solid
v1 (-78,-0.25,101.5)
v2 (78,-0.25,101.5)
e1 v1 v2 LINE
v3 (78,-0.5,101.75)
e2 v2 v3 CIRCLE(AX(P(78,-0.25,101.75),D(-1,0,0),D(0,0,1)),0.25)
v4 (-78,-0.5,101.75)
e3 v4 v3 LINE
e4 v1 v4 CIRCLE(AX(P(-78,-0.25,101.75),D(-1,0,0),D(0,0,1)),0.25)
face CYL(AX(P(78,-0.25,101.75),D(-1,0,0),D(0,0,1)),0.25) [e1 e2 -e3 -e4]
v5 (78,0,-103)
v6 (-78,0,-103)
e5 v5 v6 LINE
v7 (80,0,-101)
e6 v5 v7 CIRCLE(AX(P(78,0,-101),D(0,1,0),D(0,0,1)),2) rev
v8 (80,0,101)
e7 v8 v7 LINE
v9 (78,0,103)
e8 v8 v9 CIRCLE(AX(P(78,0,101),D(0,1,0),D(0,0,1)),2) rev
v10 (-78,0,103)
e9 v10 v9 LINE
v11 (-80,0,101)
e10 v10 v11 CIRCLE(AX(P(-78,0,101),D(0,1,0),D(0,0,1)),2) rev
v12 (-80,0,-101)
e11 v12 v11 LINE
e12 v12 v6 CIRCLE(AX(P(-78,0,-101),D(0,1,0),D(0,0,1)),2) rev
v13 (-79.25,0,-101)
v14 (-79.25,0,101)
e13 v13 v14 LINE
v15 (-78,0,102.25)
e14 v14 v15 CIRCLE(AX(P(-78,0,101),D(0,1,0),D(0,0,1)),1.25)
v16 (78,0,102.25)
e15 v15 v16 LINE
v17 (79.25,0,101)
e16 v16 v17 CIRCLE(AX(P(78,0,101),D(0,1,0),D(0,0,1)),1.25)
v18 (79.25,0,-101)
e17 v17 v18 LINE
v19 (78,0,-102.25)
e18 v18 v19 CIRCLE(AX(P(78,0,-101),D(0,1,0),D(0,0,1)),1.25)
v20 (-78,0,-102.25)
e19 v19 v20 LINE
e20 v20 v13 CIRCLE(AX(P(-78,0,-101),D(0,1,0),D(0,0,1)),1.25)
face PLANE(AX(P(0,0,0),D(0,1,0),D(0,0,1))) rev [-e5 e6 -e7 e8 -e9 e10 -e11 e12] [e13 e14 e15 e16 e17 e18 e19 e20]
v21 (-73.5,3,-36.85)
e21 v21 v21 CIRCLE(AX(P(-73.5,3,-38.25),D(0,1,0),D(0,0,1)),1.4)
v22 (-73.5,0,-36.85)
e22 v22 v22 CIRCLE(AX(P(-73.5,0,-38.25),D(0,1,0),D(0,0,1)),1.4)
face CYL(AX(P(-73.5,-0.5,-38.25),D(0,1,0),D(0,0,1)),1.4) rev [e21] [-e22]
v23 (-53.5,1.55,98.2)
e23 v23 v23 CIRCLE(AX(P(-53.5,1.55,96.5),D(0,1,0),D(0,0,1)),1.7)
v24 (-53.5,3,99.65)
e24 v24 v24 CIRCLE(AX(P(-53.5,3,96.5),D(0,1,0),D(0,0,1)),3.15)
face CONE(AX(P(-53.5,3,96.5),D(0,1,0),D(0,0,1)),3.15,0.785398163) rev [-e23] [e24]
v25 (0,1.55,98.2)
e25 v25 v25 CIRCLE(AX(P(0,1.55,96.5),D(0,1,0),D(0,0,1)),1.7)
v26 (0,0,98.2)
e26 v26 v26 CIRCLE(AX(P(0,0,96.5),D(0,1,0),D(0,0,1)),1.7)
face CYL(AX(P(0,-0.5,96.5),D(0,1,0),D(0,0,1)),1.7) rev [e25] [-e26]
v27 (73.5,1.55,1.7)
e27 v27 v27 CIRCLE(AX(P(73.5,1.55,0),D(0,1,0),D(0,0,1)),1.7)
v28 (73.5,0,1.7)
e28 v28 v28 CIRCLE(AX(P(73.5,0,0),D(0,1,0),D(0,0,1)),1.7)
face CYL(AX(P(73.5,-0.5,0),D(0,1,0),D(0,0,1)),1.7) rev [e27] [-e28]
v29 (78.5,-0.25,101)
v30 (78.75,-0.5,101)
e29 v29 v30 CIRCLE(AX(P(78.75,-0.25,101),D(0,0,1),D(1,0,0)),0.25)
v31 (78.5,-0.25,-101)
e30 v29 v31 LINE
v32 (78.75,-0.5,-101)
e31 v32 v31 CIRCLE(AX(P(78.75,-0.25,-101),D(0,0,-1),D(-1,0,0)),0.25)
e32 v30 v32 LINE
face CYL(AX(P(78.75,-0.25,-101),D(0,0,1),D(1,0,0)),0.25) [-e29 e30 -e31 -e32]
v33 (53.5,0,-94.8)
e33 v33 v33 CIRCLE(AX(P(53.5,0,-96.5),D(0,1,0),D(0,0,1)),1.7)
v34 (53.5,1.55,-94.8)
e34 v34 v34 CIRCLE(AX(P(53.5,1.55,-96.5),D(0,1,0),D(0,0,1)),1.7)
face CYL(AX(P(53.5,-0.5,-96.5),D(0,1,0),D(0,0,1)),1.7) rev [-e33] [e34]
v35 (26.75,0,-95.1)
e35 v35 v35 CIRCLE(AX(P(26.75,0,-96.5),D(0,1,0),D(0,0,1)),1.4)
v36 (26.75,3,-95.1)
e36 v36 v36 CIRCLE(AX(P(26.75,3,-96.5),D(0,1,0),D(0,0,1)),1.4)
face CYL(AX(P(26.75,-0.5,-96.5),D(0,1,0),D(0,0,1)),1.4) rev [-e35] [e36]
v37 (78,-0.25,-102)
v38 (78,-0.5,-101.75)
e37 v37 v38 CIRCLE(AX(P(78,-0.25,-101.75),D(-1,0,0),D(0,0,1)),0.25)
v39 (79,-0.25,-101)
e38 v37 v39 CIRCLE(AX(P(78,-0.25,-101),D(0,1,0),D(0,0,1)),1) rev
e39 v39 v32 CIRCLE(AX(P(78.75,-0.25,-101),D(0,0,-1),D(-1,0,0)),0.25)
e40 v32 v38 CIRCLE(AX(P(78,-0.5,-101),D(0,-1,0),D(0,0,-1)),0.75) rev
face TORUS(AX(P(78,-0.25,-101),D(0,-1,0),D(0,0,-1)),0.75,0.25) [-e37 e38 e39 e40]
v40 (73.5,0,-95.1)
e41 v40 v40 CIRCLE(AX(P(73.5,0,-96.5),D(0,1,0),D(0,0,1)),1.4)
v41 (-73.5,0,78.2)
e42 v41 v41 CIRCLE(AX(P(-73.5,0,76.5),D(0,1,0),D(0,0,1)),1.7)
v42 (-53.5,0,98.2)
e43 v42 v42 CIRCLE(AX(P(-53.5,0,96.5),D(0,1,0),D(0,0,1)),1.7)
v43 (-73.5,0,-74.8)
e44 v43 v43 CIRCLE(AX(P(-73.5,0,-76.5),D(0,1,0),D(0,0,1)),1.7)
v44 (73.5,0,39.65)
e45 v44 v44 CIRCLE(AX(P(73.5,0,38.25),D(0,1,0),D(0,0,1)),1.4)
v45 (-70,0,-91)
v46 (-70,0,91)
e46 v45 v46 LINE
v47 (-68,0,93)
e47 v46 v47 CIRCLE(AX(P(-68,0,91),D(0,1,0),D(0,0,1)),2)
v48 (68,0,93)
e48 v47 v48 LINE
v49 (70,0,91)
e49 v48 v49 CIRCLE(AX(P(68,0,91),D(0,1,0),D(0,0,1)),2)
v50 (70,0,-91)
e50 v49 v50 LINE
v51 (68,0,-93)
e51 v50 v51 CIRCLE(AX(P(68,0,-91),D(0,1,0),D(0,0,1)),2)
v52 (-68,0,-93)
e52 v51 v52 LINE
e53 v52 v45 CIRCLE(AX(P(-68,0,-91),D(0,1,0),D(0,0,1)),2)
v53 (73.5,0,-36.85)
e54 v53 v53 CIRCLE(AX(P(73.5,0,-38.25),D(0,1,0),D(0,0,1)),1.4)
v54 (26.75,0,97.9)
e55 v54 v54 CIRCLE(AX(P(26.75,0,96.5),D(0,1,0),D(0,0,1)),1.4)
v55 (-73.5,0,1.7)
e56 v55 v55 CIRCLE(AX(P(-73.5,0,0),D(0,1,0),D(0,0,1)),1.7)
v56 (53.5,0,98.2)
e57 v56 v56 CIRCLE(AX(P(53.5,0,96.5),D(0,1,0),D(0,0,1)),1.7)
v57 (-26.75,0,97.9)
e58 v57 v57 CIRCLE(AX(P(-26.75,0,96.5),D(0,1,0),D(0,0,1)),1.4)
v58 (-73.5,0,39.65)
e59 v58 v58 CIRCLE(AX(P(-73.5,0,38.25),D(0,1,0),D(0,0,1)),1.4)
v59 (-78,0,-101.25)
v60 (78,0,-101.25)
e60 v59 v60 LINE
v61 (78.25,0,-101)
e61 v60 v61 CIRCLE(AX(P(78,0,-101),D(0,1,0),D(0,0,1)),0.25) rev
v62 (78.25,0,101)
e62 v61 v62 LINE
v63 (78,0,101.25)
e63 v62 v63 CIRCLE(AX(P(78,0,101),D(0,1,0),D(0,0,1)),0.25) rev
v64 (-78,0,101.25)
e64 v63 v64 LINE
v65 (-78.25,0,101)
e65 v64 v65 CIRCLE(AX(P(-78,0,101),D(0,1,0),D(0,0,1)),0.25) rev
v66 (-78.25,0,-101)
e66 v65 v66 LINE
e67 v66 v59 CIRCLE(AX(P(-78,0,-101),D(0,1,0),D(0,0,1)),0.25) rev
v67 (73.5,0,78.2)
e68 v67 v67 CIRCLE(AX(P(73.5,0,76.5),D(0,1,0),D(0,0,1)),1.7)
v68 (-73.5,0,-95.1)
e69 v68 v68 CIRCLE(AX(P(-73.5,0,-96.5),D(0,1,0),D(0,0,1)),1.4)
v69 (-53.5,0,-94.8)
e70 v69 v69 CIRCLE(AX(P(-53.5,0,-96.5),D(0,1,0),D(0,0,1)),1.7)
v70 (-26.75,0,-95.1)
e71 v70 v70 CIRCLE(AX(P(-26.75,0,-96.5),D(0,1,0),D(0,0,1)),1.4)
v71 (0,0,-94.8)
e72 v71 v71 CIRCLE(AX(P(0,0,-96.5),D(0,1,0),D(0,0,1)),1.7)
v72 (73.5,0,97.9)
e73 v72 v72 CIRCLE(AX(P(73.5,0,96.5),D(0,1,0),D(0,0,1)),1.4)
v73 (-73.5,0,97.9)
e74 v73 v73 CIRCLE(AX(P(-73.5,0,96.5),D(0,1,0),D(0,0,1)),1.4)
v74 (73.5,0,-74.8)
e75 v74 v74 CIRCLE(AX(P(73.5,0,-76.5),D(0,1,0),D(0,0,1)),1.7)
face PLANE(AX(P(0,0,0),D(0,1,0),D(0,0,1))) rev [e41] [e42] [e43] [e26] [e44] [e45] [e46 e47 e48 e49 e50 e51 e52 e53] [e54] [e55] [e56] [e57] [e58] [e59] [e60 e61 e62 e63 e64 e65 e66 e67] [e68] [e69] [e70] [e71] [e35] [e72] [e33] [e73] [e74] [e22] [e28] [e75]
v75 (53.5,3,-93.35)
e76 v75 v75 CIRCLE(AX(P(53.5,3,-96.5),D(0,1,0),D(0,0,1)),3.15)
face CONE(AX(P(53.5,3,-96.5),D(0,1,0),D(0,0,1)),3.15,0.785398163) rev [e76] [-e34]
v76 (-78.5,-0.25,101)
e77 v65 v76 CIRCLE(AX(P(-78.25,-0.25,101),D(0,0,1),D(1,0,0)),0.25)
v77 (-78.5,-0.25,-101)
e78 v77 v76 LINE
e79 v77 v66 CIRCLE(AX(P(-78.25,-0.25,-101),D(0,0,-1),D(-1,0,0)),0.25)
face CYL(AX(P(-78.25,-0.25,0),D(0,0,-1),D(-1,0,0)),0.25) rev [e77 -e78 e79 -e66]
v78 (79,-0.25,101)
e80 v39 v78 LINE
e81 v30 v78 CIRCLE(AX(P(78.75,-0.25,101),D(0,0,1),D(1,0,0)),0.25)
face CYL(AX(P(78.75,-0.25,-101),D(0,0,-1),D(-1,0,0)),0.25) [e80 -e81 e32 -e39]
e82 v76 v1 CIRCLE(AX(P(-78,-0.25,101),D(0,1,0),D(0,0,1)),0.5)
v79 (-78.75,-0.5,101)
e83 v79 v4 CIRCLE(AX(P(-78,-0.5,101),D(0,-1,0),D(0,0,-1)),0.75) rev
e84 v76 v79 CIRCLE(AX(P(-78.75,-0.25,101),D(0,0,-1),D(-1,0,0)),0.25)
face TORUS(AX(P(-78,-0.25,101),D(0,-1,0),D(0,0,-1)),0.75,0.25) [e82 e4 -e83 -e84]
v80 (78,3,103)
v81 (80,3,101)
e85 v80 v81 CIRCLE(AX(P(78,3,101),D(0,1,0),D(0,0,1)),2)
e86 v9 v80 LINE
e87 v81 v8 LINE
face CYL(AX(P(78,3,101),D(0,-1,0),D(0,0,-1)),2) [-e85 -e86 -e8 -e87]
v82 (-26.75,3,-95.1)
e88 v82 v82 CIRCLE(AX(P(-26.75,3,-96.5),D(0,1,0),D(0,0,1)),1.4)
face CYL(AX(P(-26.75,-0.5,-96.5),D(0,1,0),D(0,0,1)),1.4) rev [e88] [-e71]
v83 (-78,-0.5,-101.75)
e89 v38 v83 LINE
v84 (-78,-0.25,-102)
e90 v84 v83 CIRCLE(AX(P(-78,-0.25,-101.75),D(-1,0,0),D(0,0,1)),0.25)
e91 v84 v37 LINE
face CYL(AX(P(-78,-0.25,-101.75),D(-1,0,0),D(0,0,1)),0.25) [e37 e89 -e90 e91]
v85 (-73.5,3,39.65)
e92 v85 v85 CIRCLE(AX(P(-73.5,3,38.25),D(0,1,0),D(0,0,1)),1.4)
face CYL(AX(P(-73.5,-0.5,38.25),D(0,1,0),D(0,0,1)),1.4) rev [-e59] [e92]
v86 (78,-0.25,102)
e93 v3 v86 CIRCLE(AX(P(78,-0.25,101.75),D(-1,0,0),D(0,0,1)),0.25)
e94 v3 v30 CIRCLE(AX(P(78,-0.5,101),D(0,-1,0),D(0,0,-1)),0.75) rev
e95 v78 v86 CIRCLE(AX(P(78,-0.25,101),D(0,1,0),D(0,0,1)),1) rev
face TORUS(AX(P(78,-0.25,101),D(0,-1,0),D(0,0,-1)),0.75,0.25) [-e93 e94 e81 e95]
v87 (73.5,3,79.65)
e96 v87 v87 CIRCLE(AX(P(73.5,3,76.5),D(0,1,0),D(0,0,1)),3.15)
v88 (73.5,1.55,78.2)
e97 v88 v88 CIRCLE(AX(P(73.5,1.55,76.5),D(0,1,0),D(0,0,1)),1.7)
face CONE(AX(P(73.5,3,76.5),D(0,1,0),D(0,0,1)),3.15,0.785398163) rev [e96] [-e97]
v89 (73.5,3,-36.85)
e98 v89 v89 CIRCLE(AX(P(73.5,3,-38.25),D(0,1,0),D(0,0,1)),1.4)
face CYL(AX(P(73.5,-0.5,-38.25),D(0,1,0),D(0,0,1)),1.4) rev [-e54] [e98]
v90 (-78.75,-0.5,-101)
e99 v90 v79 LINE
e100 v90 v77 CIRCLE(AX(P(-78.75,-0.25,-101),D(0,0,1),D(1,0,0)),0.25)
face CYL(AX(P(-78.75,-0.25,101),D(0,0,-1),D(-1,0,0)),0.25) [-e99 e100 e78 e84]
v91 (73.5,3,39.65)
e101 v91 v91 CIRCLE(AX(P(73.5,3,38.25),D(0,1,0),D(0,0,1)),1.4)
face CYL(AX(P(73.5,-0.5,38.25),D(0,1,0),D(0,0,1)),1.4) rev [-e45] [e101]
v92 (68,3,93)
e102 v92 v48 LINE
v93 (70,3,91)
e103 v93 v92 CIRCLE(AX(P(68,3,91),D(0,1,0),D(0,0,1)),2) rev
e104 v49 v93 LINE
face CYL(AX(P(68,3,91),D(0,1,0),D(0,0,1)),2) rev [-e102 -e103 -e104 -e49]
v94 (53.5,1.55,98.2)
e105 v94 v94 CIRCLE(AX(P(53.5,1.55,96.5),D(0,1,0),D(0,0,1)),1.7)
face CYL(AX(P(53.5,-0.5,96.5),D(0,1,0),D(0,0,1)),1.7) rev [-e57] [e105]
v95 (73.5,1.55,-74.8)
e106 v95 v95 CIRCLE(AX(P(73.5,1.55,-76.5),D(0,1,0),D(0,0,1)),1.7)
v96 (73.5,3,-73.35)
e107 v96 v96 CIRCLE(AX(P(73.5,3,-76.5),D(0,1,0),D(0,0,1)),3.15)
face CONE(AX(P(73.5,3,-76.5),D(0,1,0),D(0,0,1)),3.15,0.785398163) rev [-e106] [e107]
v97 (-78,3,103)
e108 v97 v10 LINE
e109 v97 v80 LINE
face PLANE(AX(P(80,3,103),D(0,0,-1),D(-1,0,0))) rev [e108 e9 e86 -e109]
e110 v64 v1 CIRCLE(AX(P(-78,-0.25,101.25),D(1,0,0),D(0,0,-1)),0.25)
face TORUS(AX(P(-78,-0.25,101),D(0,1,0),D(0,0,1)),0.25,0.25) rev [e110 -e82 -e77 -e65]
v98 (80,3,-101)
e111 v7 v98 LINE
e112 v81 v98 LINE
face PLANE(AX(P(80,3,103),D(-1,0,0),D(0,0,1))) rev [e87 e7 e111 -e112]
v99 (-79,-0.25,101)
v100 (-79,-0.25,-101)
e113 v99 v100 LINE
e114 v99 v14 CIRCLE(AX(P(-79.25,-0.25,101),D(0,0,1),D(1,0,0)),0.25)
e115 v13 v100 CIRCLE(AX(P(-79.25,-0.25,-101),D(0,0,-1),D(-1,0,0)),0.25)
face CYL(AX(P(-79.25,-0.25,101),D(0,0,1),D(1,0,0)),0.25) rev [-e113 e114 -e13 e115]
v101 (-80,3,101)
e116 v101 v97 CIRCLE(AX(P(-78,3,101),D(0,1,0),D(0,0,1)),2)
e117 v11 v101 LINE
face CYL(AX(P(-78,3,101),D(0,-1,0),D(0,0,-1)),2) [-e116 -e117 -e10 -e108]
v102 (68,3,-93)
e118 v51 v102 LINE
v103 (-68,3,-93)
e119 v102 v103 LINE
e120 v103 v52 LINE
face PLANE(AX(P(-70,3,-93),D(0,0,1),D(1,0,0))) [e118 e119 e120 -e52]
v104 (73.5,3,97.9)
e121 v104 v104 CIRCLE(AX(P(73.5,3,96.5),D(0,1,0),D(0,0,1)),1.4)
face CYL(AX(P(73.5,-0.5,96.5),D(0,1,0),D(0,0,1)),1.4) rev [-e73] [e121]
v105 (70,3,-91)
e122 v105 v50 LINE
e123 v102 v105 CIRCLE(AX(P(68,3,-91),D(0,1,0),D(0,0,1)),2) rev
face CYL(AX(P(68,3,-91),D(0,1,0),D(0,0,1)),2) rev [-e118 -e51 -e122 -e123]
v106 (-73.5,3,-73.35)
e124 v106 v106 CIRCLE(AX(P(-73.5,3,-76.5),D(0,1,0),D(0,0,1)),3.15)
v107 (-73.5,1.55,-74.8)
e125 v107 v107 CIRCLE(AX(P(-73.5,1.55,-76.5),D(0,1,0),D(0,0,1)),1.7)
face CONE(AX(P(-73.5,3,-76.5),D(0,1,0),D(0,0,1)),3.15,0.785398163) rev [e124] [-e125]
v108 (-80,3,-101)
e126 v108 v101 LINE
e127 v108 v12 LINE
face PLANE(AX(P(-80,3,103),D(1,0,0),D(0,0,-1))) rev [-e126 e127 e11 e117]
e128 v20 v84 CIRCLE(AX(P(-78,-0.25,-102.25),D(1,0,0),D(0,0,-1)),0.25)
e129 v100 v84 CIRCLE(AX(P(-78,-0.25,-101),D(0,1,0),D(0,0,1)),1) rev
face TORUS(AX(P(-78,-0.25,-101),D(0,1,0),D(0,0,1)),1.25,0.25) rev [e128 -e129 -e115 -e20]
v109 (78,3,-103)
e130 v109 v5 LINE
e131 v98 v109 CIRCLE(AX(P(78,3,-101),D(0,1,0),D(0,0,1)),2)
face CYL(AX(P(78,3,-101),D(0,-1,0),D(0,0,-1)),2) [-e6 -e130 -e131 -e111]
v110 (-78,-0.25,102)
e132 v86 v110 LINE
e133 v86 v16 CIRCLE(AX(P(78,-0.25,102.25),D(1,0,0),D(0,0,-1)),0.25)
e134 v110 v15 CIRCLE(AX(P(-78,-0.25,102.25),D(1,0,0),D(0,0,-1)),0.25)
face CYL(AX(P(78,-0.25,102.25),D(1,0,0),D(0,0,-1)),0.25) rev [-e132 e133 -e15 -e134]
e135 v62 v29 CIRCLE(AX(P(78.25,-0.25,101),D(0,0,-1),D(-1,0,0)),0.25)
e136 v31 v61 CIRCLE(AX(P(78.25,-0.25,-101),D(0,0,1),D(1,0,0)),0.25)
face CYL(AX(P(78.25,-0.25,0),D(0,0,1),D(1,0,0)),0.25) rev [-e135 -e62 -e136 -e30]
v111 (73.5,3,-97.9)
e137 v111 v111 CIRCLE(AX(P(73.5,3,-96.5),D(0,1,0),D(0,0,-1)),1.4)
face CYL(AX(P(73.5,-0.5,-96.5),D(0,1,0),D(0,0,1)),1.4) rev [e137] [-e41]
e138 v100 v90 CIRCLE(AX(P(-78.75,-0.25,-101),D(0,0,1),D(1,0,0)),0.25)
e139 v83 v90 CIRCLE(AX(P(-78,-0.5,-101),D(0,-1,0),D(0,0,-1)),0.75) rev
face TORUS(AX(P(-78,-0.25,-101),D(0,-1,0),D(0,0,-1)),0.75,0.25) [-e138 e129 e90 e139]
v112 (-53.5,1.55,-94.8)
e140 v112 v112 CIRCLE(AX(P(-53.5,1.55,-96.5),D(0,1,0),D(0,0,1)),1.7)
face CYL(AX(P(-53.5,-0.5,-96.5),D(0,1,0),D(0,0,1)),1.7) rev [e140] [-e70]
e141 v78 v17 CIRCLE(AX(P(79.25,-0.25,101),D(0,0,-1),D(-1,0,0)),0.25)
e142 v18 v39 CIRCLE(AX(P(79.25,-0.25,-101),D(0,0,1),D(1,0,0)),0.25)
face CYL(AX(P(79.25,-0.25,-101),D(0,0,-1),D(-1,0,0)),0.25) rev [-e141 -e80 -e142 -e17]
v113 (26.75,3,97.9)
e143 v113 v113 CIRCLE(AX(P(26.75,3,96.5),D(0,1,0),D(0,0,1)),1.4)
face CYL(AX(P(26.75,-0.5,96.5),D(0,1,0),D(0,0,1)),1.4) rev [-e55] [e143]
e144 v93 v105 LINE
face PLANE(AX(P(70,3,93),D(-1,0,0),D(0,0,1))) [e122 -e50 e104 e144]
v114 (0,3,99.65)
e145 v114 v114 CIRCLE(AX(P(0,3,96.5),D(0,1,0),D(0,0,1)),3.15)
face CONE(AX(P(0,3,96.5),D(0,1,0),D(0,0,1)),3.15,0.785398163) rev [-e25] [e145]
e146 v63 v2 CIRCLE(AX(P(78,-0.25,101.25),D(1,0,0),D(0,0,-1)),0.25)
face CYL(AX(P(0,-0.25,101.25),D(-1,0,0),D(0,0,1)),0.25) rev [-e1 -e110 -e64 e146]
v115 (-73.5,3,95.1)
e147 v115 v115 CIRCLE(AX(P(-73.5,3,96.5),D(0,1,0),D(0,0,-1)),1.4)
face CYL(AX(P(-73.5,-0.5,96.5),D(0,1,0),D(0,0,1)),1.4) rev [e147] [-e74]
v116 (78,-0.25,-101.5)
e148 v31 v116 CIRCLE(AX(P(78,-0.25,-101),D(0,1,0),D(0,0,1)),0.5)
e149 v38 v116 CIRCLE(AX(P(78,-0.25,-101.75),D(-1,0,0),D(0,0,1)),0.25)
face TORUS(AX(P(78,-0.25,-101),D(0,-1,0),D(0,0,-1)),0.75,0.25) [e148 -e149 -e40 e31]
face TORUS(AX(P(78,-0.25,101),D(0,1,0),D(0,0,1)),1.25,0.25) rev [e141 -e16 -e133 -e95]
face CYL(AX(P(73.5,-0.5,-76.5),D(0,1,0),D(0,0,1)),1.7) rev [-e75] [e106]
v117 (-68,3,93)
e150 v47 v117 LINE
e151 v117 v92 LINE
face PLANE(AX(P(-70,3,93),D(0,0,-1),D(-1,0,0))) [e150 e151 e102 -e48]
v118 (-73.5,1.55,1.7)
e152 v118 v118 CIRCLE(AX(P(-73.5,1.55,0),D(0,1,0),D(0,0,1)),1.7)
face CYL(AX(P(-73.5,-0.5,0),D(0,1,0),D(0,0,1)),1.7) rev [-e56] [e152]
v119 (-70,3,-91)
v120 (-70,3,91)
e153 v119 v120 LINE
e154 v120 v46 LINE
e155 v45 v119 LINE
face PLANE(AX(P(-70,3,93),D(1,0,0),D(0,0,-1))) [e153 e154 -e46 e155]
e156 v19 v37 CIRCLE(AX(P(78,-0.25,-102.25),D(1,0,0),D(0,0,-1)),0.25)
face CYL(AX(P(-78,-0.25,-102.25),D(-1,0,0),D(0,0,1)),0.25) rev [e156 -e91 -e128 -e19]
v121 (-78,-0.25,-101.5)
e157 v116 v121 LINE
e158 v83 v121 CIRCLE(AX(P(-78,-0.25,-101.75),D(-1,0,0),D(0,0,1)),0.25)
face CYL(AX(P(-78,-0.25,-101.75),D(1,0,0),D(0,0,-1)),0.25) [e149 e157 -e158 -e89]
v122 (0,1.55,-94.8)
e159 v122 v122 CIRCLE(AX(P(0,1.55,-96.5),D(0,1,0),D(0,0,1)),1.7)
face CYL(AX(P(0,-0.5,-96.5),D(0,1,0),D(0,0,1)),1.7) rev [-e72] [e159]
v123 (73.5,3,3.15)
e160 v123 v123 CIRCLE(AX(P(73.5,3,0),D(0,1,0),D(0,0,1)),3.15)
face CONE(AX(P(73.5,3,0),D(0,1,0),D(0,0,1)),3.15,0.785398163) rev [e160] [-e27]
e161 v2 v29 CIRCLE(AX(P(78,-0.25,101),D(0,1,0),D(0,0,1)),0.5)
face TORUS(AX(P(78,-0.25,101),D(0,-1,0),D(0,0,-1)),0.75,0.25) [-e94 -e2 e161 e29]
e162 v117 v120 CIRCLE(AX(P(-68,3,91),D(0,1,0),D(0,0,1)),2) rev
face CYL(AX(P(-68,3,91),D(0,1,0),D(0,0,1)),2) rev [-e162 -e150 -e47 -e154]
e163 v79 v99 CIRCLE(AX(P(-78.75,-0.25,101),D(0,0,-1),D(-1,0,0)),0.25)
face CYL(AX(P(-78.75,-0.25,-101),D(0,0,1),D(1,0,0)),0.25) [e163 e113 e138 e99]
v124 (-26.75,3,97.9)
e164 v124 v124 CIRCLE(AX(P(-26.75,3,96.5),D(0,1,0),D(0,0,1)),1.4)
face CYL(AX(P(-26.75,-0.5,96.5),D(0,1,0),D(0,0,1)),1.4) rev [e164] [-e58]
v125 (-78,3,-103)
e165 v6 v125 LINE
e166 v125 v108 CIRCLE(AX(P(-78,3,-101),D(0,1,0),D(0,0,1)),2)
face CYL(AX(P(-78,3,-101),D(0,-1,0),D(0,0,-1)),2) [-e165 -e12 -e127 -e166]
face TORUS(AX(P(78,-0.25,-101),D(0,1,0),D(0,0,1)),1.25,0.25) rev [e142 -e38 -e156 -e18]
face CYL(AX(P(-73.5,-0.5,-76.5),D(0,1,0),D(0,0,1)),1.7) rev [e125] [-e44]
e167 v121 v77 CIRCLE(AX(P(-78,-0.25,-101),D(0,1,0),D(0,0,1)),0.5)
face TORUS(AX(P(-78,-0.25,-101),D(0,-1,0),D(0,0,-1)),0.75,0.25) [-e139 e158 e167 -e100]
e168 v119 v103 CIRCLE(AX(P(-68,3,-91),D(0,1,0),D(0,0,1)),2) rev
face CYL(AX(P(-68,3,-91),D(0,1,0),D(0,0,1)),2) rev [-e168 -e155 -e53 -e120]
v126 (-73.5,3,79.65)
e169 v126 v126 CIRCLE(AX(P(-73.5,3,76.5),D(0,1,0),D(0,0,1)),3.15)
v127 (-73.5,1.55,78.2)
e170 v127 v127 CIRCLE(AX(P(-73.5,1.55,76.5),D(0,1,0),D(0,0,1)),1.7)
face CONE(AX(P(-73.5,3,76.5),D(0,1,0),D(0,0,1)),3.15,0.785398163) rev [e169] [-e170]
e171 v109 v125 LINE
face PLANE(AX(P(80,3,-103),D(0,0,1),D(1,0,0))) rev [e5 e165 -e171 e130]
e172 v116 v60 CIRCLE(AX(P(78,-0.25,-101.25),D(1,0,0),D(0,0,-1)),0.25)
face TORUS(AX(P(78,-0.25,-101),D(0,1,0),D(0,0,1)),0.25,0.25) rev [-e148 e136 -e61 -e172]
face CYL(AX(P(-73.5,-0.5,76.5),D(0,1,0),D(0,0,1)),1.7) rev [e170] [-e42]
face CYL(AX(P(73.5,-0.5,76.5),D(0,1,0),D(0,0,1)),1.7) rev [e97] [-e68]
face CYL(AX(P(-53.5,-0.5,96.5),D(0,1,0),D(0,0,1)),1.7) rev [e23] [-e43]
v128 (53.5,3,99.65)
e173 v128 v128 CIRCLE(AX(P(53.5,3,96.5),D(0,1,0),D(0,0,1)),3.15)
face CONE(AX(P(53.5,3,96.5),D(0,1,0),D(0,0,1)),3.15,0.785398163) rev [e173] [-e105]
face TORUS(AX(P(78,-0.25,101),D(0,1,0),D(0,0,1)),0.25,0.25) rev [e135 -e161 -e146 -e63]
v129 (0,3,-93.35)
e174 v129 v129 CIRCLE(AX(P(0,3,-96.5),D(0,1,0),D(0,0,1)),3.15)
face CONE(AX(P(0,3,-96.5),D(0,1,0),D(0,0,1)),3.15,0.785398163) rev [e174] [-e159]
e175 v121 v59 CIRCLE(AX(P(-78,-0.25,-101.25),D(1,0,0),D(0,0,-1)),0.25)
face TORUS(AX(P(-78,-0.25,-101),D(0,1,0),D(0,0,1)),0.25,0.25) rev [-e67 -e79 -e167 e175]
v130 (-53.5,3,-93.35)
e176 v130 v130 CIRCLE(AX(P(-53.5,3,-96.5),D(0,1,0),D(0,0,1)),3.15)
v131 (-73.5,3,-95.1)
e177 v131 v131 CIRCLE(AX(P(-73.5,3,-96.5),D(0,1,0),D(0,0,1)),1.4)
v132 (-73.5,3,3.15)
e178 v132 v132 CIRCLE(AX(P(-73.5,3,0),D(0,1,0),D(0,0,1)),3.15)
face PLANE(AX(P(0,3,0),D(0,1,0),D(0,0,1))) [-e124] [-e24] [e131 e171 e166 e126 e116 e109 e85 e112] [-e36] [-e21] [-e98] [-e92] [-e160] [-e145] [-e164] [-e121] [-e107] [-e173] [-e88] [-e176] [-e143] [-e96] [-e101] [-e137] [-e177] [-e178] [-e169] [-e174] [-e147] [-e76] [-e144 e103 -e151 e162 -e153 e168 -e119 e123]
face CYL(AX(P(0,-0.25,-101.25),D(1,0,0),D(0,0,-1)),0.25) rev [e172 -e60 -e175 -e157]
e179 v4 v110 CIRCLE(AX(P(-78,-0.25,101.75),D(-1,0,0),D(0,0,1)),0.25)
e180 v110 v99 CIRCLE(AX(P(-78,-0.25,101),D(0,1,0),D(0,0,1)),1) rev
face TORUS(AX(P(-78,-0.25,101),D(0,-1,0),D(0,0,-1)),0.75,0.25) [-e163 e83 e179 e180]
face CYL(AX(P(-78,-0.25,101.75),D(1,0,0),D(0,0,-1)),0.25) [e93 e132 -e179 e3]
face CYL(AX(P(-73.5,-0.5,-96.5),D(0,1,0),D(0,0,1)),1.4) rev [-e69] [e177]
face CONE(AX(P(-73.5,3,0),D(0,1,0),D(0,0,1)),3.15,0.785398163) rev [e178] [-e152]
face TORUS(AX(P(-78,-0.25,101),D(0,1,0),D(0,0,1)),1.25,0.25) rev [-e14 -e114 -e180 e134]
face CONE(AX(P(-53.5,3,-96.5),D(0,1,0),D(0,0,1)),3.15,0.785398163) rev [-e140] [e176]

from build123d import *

# Parameters (mm, degrees)
SKETCH1_W                                      = 160
SKETCH1_H                                      = 206
SKETCH1_W_2                                    = 140
SKETCH1_H_2                                    = 186
BOSS_EXTRUDE1_DEPTH                            = 3
FILLET1_R                                      = 2
BOSS_EXTRUDE3_DEPTH                            = 0.5
FILLET2_R                                      = 0.25
SKETCH10_R                                     = 1.7
SKETCH10_R_2                                   = 1.4
CUT_EXTRUDE1_DEPTH                             = 131.465512684
CSK_FOR_M3_FLAT_HEAD_MACHINE_SCREW2_AT_2_COUNT = 2
CSK_FOR_M3_FLAT_HEAD_MACHINE_SCREW2_AT_2_PITCH = 53.5
CSK_FOR_M3_FLAT_HEAD_MACHINE_SCREW2_AT_3_COUNT = 2
CSK_FOR_M3_FLAT_HEAD_MACHINE_SCREW2_AT_3_PITCH = 28.284271247
CSK_FOR_M3_FLAT_HEAD_MACHINE_SCREW2_AT_4_COUNT = 2
CSK_FOR_M3_FLAT_HEAD_MACHINE_SCREW2_AT_4_PITCH = 107
CSK_FOR_M3_FLAT_HEAD_MACHINE_SCREW2_AT_5_COUNT = 2
CSK_FOR_M3_FLAT_HEAD_MACHINE_SCREW2_AT_5_PITCH = 128.565158577
CSK_FOR_M3_FLAT_HEAD_MACHINE_SCREW2_AT_6_COUNT = 2
CSK_FOR_M3_FLAT_HEAD_MACHINE_SCREW2_AT_6_PITCH = 159.503134765
CSK_FOR_M3_FLAT_HEAD_MACHINE_SCREW2_AT_7_COUNT = 2
CSK_FOR_M3_FLAT_HEAD_MACHINE_SCREW2_AT_7_PITCH = 220.676233428
CSK_FOR_M3_FLAT_HEAD_MACHINE_SCREW2_AT_8_COUNT = 2
CSK_FOR_M3_FLAT_HEAD_MACHINE_SCREW2_AT_8_PITCH = 200.277931885
CSK_FOR_M3_FLAT_HEAD_MACHINE_SCREW2_AT_9_COUNT = 2
CSK_FOR_M3_FLAT_HEAD_MACHINE_SCREW2_AT_9_PITCH = 193
CSK_FOR_M3_FLAT_HEAD_MACHINE_SCREW2_AT_1_COUNT = 2
CSK_FOR_M3_FLAT_HEAD_MACHINE_SCREW2_AT_1_PITCH = 174.152232257
CSK_FOR_M3_FLAT_HEAD_MACHINE_SCREW2_2_COUNT    = 2
CSK_FOR_M3_FLAT_HEAD_MACHINE_SCREW2_2_PITCH    = 214.611276498
CSK_FOR_M3_FLAT_HEAD_MACHINE_SCREW2_3_COUNT    = 2
CSK_FOR_M3_FLAT_HEAD_MACHINE_SCREW2_3_PITCH    = 98.550748348


with BuildPart() as part:
    # Sketch1 → Boss-Extrude1 (new body)
    with BuildSketch(Plane(origin=(0, 0, 0), x_dir=(1, 0, 0), z_dir=(0, 1, 0))):
        Rectangle(SKETCH1_W, SKETCH1_H)
        Rectangle(SKETCH1_W_2, SKETCH1_H_2, mode=Mode.SUBTRACT)
    extrude(amount=BOSS_EXTRUDE1_DEPTH)

    # Fillet1
    fillet1_edges = [part.edges().sort_by_distance(p)[0] for p in [
        (70, 1.5, 93),
        (70, 1.5, -93),
        (-70, 1.5, -93),
        (-70, 1.5, 93),
        (-80, 1.5, -103),
        (80, 1.5, -103),
        (80, 1.5, 103),
        (-80, 1.5, 103),
    ]]
    fillet(fillet1_edges, radius=FILLET1_R)

    # Sketch6 → Boss-Extrude3 (add)
    with BuildSketch(Plane.XZ):
        with BuildLine():
            Line((-78, -102), (78, -102))
            ThreePointArc((78, -102), (78.707106781, -101.707106781), (79, -101))
            Line((79, -101), (79, 101))
            ThreePointArc((79, 101), (78.707106781, 101.707106781), (78, 102))
            Line((78, 102), (-78, 102))
            ThreePointArc((-78, 102), (-78.707106781, 101.707106781), (-79, 101))
            Line((-79, 101), (-79, -101))
            ThreePointArc((-79, -101), (-78.707106781, -101.707106781), (-78, -102))
        make_face()
        with BuildLine():
            Line((-78, -101.5), (78, -101.5))
            ThreePointArc((78, -101.5), (78.353553391, -101.353553391), (78.5, -101))
            Line((78.5, -101), (78.5, 101))
            ThreePointArc((78.5, 101), (78.353553391, 101.353553391), (78, 101.5))
            Line((78, 101.5), (-78, 101.5))
            ThreePointArc((-78, 101.5), (-78.353553391, 101.353553391), (-78.5, 101))
            Line((-78.5, 101), (-78.5, -101))
            ThreePointArc((-78.5, -101), (-78.353553391, -101.353553391), (-78, -101.5))
        make_face(mode=Mode.SUBTRACT)
    extrude(amount=BOSS_EXTRUDE3_DEPTH)

    # Fillet2
    fillet2_edges = [part.edges().sort_by_distance(p)[0] for p in [
        (-78.353553391, 0, -101.353553391),
        (-78.5, 0, 0),
        (-78.353553391, 0, 101.353553391),
        (0, 0, 101.5),
        (78.353553391, 0, 101.353553391),
        (78.5, 0, 0),
        (78.353553391, 0, -101.353553391),
        (-78.707106781, 0, -101.707106781),
        (-79, 0, 0),
        (-78.707106781, 0, 101.707106781),
        (0, 0, 102),
        (78.707106781, 0, 101.707106781),
        (79, 0, 0),
        (78.707106781, 0, -101.707106781),
        (0, 0, -101.5),
        (0, 0, -102),
    ]]
    fillet(fillet2_edges, radius=FILLET2_R)
    fillet2_2_edges = [part.edges().sort_by_distance(p)[0] for p in [
        (-79, -0.5, 0),
        (-78.707106781, -0.5, 101.707106781),
        (0, -0.5, 102),
        (78.707106781, -0.5, 101.707106781),
        (79, -0.5, 0),
        (78.707106781, -0.5, -101.707106781),
        (0, -0.5, -102),
        (-78.5, -0.5, 0),
        (-78.353553391, -0.5, 101.353553391),
        (0, -0.5, 101.5),
        (78.353553391, -0.5, 101.353553391),
        (78.5, -0.5, 0),
        (78.353553391, -0.5, -101.353553391),
        (0, -0.5, -101.5),
        (-78.707106781, -0.5, -101.707106781),
        (-78.353553391, -0.5, -101.353553391),
    ]]
    fillet(fillet2_2_edges, radius=FILLET2_R - 0.0001)  # a hair under: the kernel refuses the full size

    # Sketch10 → Cut-Extrude1 (cut, through all)
    with BuildSketch(Plane(origin=(0, 3, 0), x_dir=(1, 0, 0), z_dir=(0, 1, 0))):
        with Locations(Location((0, 96.5, 0), (0, 0, 270))):
            Circle(SKETCH10_R)
        with Locations(Location((-53.5, 96.5, 0), (0, 0, 270))):
            Circle(SKETCH10_R)
        with Locations(Location((-73.5, 76.5, 0), (0, 0, 270))):
            Circle(SKETCH10_R)
        with Locations(Location((-73.5, 0, 0), (0, 0, 270))):
            Circle(SKETCH10_R)
        with Locations(Location((-73.5, -76.5, 0), (0, 0, 270))):
            Circle(SKETCH10_R)
        with Locations(Location((-53.5, -96.5, 0), (0, 0, 270))):
            Circle(SKETCH10_R)
        with Locations(Location((0, -96.5, 0), (0, 0, 270))):
            Circle(SKETCH10_R)
        with Locations(Location((53.5, -96.5, 0), (0, 0, 270))):
            Circle(SKETCH10_R)
        with Locations(Location((73.5, -76.5, 0), (0, 0, 270))):
            Circle(SKETCH10_R)
        with Locations(Location((73.5, 0, 0), (0, 0, 270))):
            Circle(SKETCH10_R)
        with Locations(Location((73.5, 76.5, 0), (0, 0, 270))):
            Circle(SKETCH10_R)
        with Locations(Location((53.5, 96.5, 0), (0, 0, 270))):
            Circle(SKETCH10_R)
        with Locations(Location((73.5, -38.25, 0), (0, 0, 270))):
            Circle(SKETCH10_R_2)
        with Locations(Location((73.5, 38.25, 0), (0, 0, 270))):
            Circle(SKETCH10_R_2)
        with Locations(Location((26.75, 96.5, 0), (0, 0, 270))):
            Circle(SKETCH10_R_2)
        with Locations(Location((-26.75, 96.5, 0), (0, 0, 270))):
            Circle(SKETCH10_R_2)
        with Locations(Location((-73.5, 38.25, 0), (0, 0, 270))):
            Circle(SKETCH10_R_2)
        with Locations(Location((-73.5, -38.25, 0), (0, 0, 270))):
            Circle(SKETCH10_R_2)
        with Locations(Location((-26.75, -96.5, 0), (0, 0, 270))):
            Circle(SKETCH10_R_2)
        with Locations(Location((26.75, -96.5, 0), (0, 0, 270))):
            Circle(SKETCH10_R_2)
        with Locations(Location((-73.5, 96.5, 0), (0, 0, 270))):
            Circle(SKETCH10_R_2)
        with Locations(Location((73.5, 96.5, 0), (0, 0, 270))):
            Circle(SKETCH10_R_2)
        with Locations(Location((73.5, -96.5, 0), (0, 0, 270))):
            Circle(SKETCH10_R_2)
        with Locations(Location((-73.5, -96.5, 0), (0, 0, 270))):
            Circle(SKETCH10_R_2)
    extrude(amount=-CUT_EXTRUDE1_DEPTH, mode=Mode.SUBTRACT)

    # Sketch11 → CSK for M3 Flat Head Machine Screw2 (revolve, cut)
    with BuildSketch(Plane(origin=(-53.5, 3, -96.5), x_dir=(0, 0, 1), z_dir=(1, 0, 0))):
        Polygon((0, 0), (0, 3.5), (1.725, 3.5), (1.7, 3.475), (1.7, 1.45), (3.15, 0), align=None)
    csk_for_m3_flat_head_machine_screw2 = revolve(axis=Axis((-53.5, 9.35, -96.5), (0, -1, 0)), mode=Mode.SUBTRACT)

    # CSK for M3 Flat Head Machine Screw2 at 2: CSK for M3 Flat Head Machine Screw2 ×2
    with Locations(*[(i * CSK_FOR_M3_FLAT_HEAD_MACHINE_SCREW2_AT_2_PITCH, 0, 0) for i in range(1, CSK_FOR_M3_FLAT_HEAD_MACHINE_SCREW2_AT_2_COUNT)]):
        add(csk_for_m3_flat_head_machine_screw2, mode=Mode.SUBTRACT)

    # CSK for M3 Flat Head Machine Screw2 at 3: CSK for M3 Flat Head Machine Screw2 ×2
    with Locations(*[Vector(-0.7071067811865476, 0, 0.7071067811865476) * (i * CSK_FOR_M3_FLAT_HEAD_MACHINE_SCREW2_AT_3_PITCH) for i in range(1, CSK_FOR_M3_FLAT_HEAD_MACHINE_SCREW2_AT_3_COUNT)]):
        add(csk_for_m3_flat_head_machine_screw2, mode=Mode.SUBTRACT)

    # CSK for M3 Flat Head Machine Screw2 at 4: CSK for M3 Flat Head Machine Screw2 ×2
    with Locations(*[(i * CSK_FOR_M3_FLAT_HEAD_MACHINE_SCREW2_AT_4_PITCH, 0, 0) for i in range(1, CSK_FOR_M3_FLAT_HEAD_MACHINE_SCREW2_AT_4_COUNT)]):
        add(csk_for_m3_flat_head_machine_screw2, mode=Mode.SUBTRACT)

    # CSK for M3 Flat Head Machine Screw2 at 5: CSK for M3 Flat Head Machine Screw2 ×2
    with Locations(*[Vector(0.9878259507117183, 0, 0.15556314184436465) * (i * CSK_FOR_M3_FLAT_HEAD_MACHINE_SCREW2_AT_5_PITCH) for i in range(1, CSK_FOR_M3_FLAT_HEAD_MACHINE_SCREW2_AT_5_COUNT)]):
        add(csk_for_m3_flat_head_machine_screw2, mode=Mode.SUBTRACT)

    # CSK for M3 Flat Head Machine Screw2 at 6: CSK for M3 Flat Head Machine Screw2 ×2
    with Locations(*[Vector(0.7962225957926617, 0, 0.6050037834172575) * (i * CSK_FOR_M3_FLAT_HEAD_MACHINE_SCREW2_AT_6_PITCH) for i in range(1, CSK_FOR_M3_FLAT_HEAD_MACHINE_SCREW2_AT_6_COUNT)]):
        add(csk_for_m3_flat_head_machine_screw2, mode=Mode.SUBTRACT)

    # CSK for M3 Flat Head Machine Screw2 at 7: CSK for M3 Flat Head Machine Screw2 ×2
    with Locations(*[Vector(0.4848732386710652, 0, 0.8745844398459376) * (i * CSK_FOR_M3_FLAT_HEAD_MACHINE_SCREW2_AT_7_PITCH) for i in range(1, CSK_FOR_M3_FLAT_HEAD_MACHINE_SCREW2_AT_7_COUNT)]):
        add(csk_for_m3_flat_head_machine_screw2, mode=Mode.SUBTRACT)

    # CSK for M3 Flat Head Machine Screw2 at 8: CSK for M3 Flat Head Machine Screw2 ×2
    with Locations(*[Vector(0.26712878197088863, 0, 0.9636608396332963) * (i * CSK_FOR_M3_FLAT_HEAD_MACHINE_SCREW2_AT_8_PITCH) for i in range(1, CSK_FOR_M3_FLAT_HEAD_MACHINE_SCREW2_AT_8_COUNT)]):
        add(csk_for_m3_flat_head_machine_screw2, mode=Mode.SUBTRACT)

    # CSK for M3 Flat Head Machine Screw2 at 9: CSK for M3 Flat Head Machine Screw2 ×2
    with Locations(*[(0, 0, i * CSK_FOR_M3_FLAT_HEAD_MACHINE_SCREW2_AT_9_PITCH) for i in range(1, CSK_FOR_M3_FLAT_HEAD_MACHINE_SCREW2_AT_9_COUNT)]):
        add(csk_for_m3_flat_head_machine_screw2, mode=Mode.SUBTRACT)

    # CSK for M3 Flat Head Machine Screw2 at 1: CSK for M3 Flat Head Machine Screw2 ×2
    with Locations(*[Vector(-0.11484205364946054, 0, 0.9933837640678321) * (i * CSK_FOR_M3_FLAT_HEAD_MACHINE_SCREW2_AT_1_PITCH) for i in range(1, CSK_FOR_M3_FLAT_HEAD_MACHINE_SCREW2_AT_1_COUNT)]):
        add(csk_for_m3_flat_head_machine_screw2, mode=Mode.SUBTRACT)

    # CSK for M3 Flat Head Machine Screw2  2: CSK for M3 Flat Head Machine Screw2 ×2
    with Locations(*[Vector(0.591767599878765, 0, 0.8061086203072921) * (i * CSK_FOR_M3_FLAT_HEAD_MACHINE_SCREW2_2_PITCH) for i in range(1, CSK_FOR_M3_FLAT_HEAD_MACHINE_SCREW2_2_COUNT)]):
        add(csk_for_m3_flat_head_machine_screw2, mode=Mode.SUBTRACT)

    # CSK for M3 Flat Head Machine Screw2  3: CSK for M3 Flat Head Machine Screw2 ×2
    with Locations(*[Vector(-0.20294112764446817, 0, 0.9791909408845609) * (i * CSK_FOR_M3_FLAT_HEAD_MACHINE_SCREW2_3_PITCH) for i in range(1, CSK_FOR_M3_FLAT_HEAD_MACHINE_SCREW2_3_COUNT)]):
        add(csk_for_m3_flat_head_machine_screw2, mode=Mode.SUBTRACT)


solid = part.part
